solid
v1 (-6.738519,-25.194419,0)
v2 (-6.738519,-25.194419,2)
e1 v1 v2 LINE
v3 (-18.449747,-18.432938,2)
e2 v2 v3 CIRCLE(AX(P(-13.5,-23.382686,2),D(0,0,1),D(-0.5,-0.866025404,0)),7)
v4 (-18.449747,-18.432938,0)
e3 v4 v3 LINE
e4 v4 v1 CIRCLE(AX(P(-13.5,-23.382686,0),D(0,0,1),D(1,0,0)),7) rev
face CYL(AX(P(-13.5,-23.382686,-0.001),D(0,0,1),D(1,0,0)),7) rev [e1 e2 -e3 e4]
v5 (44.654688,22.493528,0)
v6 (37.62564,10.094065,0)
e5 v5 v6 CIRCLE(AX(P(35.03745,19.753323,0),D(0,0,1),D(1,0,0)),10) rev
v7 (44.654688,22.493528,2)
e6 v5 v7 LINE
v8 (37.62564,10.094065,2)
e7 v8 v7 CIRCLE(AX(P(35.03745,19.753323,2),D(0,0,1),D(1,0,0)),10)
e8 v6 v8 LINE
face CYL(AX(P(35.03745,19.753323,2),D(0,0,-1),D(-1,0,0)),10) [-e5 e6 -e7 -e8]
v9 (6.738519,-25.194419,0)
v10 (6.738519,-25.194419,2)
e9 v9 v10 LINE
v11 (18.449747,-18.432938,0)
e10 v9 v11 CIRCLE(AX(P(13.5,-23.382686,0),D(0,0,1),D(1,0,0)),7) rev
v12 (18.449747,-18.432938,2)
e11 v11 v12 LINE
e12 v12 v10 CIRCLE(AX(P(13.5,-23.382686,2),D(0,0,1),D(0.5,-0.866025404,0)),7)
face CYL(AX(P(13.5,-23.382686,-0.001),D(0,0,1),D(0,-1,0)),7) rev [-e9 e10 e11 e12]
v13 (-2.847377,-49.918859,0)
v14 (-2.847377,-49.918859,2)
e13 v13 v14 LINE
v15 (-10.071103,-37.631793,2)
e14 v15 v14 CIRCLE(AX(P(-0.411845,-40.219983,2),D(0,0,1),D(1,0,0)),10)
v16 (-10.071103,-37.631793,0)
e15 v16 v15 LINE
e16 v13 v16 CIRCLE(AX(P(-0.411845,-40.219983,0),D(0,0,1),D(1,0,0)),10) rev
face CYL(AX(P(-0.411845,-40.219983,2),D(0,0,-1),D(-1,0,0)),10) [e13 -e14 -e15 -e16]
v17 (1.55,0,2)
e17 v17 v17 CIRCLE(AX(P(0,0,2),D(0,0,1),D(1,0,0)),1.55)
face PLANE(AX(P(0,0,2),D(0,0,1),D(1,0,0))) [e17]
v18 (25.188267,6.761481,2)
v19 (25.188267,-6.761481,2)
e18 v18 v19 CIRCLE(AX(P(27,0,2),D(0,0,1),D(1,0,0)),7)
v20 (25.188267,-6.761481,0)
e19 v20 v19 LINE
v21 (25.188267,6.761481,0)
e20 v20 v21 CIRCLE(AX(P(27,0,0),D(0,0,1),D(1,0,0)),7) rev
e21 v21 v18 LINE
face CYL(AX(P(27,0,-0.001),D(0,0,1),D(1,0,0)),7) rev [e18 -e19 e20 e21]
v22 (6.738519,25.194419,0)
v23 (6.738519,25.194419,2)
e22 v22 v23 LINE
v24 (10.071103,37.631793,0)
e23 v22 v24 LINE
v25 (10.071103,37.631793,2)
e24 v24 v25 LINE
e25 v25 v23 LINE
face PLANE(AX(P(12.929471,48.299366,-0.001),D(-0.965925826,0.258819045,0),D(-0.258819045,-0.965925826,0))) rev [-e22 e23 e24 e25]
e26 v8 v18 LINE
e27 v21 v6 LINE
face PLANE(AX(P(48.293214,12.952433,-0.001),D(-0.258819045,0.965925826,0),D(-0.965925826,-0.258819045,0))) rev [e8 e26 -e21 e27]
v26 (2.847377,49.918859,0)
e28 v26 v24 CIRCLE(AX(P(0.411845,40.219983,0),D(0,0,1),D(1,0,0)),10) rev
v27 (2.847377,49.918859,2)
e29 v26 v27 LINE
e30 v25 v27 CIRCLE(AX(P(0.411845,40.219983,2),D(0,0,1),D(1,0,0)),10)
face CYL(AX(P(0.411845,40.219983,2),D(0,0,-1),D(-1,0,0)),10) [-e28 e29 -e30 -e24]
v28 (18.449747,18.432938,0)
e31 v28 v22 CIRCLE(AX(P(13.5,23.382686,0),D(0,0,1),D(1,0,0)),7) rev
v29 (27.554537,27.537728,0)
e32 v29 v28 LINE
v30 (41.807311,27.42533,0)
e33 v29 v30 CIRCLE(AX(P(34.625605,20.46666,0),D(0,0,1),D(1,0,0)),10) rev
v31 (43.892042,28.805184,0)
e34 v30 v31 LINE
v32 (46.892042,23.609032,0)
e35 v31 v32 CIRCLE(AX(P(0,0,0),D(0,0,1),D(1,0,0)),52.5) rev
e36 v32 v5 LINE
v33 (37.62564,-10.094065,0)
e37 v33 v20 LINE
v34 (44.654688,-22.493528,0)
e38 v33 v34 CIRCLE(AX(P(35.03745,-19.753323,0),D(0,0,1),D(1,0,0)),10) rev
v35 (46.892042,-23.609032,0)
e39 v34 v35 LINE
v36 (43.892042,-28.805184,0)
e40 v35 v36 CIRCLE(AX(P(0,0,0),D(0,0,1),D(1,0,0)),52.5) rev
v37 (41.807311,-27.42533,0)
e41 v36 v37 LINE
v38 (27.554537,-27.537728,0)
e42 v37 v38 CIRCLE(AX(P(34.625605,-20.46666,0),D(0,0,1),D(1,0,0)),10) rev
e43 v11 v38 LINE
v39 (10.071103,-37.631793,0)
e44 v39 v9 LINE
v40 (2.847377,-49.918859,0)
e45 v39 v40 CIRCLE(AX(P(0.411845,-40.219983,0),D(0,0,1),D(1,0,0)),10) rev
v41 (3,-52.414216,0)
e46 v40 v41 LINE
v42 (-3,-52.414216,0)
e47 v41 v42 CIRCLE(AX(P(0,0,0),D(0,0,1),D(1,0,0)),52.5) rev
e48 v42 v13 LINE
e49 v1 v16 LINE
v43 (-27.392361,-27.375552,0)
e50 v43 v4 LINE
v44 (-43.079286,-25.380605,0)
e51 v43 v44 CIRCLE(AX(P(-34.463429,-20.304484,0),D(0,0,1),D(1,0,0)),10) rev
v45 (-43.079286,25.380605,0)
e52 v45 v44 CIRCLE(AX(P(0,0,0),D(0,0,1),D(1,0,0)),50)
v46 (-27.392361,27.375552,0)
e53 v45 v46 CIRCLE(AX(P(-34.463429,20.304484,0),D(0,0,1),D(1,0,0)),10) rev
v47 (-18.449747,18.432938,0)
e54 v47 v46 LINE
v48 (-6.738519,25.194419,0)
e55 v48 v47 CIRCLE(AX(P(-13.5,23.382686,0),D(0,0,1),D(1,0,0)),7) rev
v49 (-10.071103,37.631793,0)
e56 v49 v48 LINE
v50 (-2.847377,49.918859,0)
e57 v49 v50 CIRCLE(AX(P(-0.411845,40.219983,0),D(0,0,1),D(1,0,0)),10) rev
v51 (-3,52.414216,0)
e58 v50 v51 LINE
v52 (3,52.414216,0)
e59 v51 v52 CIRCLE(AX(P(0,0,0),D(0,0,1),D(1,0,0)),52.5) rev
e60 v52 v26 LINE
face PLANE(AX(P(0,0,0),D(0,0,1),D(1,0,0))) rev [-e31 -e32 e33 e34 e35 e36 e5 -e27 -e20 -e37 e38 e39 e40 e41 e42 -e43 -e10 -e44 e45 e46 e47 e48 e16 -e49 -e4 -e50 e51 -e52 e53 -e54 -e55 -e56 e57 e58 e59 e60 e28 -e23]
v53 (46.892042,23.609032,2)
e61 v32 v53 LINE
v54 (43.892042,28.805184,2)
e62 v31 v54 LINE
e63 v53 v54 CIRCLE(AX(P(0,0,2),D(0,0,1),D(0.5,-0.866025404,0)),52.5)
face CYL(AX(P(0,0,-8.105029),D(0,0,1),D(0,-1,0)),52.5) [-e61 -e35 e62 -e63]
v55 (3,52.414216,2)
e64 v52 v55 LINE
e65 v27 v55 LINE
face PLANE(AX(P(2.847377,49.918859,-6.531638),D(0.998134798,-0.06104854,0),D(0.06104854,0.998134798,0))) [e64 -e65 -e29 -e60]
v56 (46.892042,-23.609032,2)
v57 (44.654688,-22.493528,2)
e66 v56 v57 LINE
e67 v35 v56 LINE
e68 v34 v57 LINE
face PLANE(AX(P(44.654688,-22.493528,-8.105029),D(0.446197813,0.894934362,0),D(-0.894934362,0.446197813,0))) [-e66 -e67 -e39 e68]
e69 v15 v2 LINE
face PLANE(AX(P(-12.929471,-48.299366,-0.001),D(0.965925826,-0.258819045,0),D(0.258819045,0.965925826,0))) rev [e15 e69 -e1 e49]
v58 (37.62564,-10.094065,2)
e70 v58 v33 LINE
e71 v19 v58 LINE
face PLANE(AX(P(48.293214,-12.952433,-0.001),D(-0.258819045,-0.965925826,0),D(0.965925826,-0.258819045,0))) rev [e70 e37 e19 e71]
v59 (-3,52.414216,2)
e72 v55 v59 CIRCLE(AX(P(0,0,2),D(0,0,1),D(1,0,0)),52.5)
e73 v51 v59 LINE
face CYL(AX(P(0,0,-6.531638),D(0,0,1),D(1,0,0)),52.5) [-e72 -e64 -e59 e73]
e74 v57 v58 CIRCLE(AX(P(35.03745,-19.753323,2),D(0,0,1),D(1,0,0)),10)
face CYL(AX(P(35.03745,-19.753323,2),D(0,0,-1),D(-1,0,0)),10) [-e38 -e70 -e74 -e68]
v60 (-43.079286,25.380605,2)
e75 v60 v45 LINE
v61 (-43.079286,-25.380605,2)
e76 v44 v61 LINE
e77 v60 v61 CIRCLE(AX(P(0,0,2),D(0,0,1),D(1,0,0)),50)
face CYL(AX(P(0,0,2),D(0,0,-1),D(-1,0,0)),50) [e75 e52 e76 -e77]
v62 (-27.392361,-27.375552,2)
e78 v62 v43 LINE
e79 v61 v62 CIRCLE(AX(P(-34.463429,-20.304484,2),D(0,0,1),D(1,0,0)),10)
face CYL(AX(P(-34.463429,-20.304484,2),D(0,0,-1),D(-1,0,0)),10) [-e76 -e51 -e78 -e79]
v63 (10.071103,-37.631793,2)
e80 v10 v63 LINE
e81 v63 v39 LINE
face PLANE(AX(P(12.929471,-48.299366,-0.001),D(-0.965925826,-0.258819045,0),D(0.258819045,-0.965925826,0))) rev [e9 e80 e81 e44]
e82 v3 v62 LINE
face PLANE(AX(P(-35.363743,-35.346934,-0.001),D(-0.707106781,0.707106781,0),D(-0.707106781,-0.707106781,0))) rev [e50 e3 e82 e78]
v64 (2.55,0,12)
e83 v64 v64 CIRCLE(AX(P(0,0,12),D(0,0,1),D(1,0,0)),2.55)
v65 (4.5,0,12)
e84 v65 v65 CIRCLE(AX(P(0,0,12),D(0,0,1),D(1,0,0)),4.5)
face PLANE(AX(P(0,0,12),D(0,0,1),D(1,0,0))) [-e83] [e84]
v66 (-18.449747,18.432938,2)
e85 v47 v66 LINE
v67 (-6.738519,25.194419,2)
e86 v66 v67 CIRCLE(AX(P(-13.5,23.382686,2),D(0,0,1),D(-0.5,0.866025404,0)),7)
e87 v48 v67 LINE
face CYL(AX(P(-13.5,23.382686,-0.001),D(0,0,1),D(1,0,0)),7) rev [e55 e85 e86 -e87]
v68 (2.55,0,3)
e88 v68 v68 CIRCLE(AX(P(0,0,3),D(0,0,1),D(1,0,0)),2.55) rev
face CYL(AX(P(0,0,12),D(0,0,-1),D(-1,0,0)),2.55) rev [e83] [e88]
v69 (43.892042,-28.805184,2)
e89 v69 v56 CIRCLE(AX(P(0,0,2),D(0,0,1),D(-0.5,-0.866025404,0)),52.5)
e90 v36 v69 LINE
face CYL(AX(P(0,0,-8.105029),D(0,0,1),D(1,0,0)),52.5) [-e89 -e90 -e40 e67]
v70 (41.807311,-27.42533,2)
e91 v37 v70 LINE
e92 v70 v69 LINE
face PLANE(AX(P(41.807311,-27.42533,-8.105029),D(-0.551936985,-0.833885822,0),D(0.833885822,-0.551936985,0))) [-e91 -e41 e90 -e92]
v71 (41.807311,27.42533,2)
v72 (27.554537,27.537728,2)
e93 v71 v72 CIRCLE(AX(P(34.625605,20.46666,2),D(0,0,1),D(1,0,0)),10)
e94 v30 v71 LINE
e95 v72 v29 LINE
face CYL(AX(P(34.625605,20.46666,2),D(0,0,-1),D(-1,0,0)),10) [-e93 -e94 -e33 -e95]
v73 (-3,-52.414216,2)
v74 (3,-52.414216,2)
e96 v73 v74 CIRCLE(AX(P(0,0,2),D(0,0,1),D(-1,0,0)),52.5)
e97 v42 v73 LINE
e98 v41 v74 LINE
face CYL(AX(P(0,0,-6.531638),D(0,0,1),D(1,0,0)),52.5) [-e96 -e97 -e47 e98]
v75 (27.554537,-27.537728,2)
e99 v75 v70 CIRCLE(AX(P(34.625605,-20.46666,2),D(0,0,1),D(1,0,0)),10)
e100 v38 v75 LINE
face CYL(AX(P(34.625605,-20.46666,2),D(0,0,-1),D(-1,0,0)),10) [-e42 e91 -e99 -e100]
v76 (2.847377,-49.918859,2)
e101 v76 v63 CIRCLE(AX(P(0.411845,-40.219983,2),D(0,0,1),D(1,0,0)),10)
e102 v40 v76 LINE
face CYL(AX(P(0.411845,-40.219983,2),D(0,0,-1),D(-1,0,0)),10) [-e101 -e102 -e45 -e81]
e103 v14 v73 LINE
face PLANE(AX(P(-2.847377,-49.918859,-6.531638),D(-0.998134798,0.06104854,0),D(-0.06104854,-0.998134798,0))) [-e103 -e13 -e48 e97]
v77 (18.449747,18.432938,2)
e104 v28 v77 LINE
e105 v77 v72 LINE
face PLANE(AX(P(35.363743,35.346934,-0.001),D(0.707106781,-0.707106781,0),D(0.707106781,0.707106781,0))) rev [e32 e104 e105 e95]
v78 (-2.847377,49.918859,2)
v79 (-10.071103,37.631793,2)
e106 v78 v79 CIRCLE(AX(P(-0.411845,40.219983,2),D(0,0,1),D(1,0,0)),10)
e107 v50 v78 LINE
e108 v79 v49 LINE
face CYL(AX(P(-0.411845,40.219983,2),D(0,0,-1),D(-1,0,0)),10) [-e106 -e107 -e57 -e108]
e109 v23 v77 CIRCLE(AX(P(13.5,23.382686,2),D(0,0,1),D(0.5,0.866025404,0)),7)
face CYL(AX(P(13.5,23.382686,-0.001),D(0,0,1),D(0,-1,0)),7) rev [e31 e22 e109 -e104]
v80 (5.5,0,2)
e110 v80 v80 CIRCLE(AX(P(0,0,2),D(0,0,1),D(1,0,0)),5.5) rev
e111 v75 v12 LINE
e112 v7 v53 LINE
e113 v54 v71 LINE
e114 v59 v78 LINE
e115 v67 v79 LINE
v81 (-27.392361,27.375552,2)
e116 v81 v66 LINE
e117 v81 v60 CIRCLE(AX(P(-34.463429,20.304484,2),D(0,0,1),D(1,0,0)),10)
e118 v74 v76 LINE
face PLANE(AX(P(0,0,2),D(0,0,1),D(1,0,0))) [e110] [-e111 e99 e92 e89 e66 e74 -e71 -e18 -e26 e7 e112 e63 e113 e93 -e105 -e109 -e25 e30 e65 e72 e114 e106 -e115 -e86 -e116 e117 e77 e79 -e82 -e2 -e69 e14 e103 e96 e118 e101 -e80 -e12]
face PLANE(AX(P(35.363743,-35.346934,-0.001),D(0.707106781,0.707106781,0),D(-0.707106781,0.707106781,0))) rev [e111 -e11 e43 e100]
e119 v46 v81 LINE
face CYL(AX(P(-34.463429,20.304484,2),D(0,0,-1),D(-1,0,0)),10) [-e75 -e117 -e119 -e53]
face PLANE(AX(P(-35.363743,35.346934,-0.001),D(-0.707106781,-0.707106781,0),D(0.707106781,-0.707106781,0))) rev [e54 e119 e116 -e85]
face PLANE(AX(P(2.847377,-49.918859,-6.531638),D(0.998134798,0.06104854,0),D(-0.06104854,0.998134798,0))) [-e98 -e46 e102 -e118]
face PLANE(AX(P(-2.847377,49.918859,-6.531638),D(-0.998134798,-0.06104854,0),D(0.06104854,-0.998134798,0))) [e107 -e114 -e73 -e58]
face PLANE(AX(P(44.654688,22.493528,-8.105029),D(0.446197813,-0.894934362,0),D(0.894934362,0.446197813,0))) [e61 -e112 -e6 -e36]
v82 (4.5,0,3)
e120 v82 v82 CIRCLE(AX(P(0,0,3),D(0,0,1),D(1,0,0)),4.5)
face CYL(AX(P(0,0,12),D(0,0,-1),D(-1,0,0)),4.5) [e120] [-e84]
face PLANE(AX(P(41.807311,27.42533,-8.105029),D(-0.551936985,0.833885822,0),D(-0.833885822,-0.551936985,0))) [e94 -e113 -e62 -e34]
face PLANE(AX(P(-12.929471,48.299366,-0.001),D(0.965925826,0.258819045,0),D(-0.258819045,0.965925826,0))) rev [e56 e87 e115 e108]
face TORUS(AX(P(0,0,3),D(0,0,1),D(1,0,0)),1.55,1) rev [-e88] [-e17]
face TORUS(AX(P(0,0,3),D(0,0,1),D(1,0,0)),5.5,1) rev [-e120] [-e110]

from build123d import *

# Parameters (mm, degrees)
SKETCH1_R                       = 50
BOSS_EXTRUDE1_DEPTH             = 2
BOSS_EXTRUDE3_START             = -2
BOSS_EXTRUDE3_DEPTH             = 2
SKETCH4_R                       = 4.5
SKETCH4_R_2                     = 2.55
BOSS_EXTRUDE2_DEPTH             = 10
CIRPATTERN2_COUNT               = 4
CIRPATTERN2_ANGLE               = 180
CUT_EXTRUDE2_REACH              = 75.186
CIRPATTERN3_COUNT               = 3
CIRPATTERN3_ANGLE               = 120
CIRPATTERN3_THE_OTHER_WAY_COUNT = 3
CIRPATTERN3_THE_OTHER_WAY_ANGLE = 120
FILLET1_R                       = 10
FILLET2_R                       = 1


with BuildPart() as part:
    # Sketch1 → Boss-Extrude1 (new body)
    with BuildSketch(Plane.XY):
        Circle(SKETCH1_R)
    extrude(amount=BOSS_EXTRUDE1_DEPTH)

    # Sketch5 → Boss-Extrude3 (add)
    with BuildSketch(Plane.XY.offset(2).offset(BOSS_EXTRUDE3_START)):
        with BuildLine():
            Line((-2.847377425, 49.918858579), (-3, 52.414215629))
            ThreePointArc((-3, 52.414215629), (0, 52.5), (3, 52.414215629))
            Line((3, 52.414215629), (2.847377425, 49.918858579))
            ThreePointArc((2.847377425, 49.918858579), (0, 50), (-2.847377425, 49.918858579))
        make_face()
    boss_extrude3 = extrude(amount=BOSS_EXTRUDE3_DEPTH)

    # Sketch4 → Boss-Extrude2 (add)
    with BuildSketch(Plane.XY.offset(2)):
        Circle(SKETCH4_R)
        Circle(SKETCH4_R_2, mode=Mode.SUBTRACT)
    extrude(amount=BOSS_EXTRUDE2_DEPTH)

    # CirPattern2: Boss-Extrude3 ×4 about axis
    cirpattern2_axis = Axis((0, 0, 0), (0, 0, -1))
    for i in range(1, CIRPATTERN2_COUNT):
        add(boss_extrude3.rotate(cirpattern2_axis, i * CIRPATTERN2_ANGLE / (CIRPATTERN2_COUNT - 1)))

    # Sketch7 → Cut-Extrude2 (cut, up to next)
    with BuildSketch(Plane.XY.offset(2), mode=Mode.PRIVATE) as cut_extrude2_sk1:
        with BuildLine():
            Line((48.293213683, 12.952432674), (25.188266684, 6.761480784))
            ThreePointArc((25.188266684, 6.761480784), (20, 0), (25.188266684, -6.761480784))
            Line((25.188266684, -6.761480784), (48.293213683, -12.952432674))
            ThreePointArc((48.293213683, -12.952432674), (50, 0), (48.293213683, 12.952432674))
        make_face()
    cut_extrude2_tool1 = extrude(cut_extrude2_sk1.sketch, amount=-CUT_EXTRUDE2_REACH, mode=Mode.PRIVATE) & part.part
    cut_extrude2 = cut_extrude2_tool1.solids().sort_by_distance((37.115477, 0, 2))[0]
    add(cut_extrude2, mode=Mode.SUBTRACT)

    # CirPattern3: Cut-Extrude2 ×3 about axis
    cirpattern3_axis = Axis((0, 0, 0), (0, 0, 1))
    for i in range(1, CIRPATTERN3_COUNT):
        add(cut_extrude2.rotate(cirpattern3_axis, i * CIRPATTERN3_ANGLE / (CIRPATTERN3_COUNT - 1)), mode=Mode.SUBTRACT)

    # CirPattern3 the other way: Cut-Extrude2 ×3 about axis
    cirpattern3_the_other_way_axis = Axis((0, 0, 0), (0, 0, -1))
    for i in range(1, CIRPATTERN3_THE_OTHER_WAY_COUNT):
        add(cut_extrude2.rotate(cirpattern3_the_other_way_axis, i * CIRPATTERN3_THE_OTHER_WAY_ANGLE / (CIRPATTERN3_THE_OTHER_WAY_COUNT - 1)), mode=Mode.SUBTRACT)

    # Fillet1
    # the kernel refuses this fillet: 10 mm, written as the material it takes off along each edge
    with BuildSketch(Plane(origin=(-35.363742578, 35.346933543, 33.509652434), x_dir=(-0.6121571340688006, -0.7907361400673886, 0), z_dir=(0, 0, -1))) as fillet1_piece_1:
        with BuildLine():
            CenterArc((11.343474876, -9.920253368), FILLET1_R, 82.759261871, 104.49509636)
            Line((1.423521402, -11.182997629), (1.225122333, -11.208252514))
            Line((1.225122333, -11.208252514), (-0.198399069, -0.025254885))
            Line((-0.198399069, -0.025254885), (-0.025207722, 0.198405067))
            ThreePointArc((-0.025207722, 0.198405067), (6.301930487, 0.59873316), (12.629068696, 0.198405067))
            Line((12.629068696, 0.198405067), (12.603860974, 0))
        make_face()
    extrude(amount=65.019304869, mode=Mode.SUBTRACT)
    with BuildSketch(Plane(origin=(-12.929471105, 48.299366217, 29.609711649), x_dir=(0.9873433189599674, 0.15859751103064706, 0), z_dir=(0, 0, -1))) as fillet1_piece_2:
        with BuildLine():
            CenterArc((11.077824317, 9.96238911), FILLET1_R, 174.125500121, 90.903649981)
            Line((1.130339641, 10.985887341), (0.931389948, 11.006357306))
            Line((0.931389948, 11.006357306), (-0.198949694, 0.020469965))
            Line((-0.198949694, 0.020469965), (-0.020422671, -0.198954554))
            ThreePointArc((-0.020422671, -0.198954554), (5.105667647, -0.46136152), (10.194005514, -0.199247782))
            Line((10.194005514, -0.199247782), (10.211335295, 0))
        make_face()
    extrude(amount=57.219423297, mode=Mode.SUBTRACT)
    with BuildSketch(Plane(origin=(35.363742578, -35.346933543, 29.609711649), x_dir=(0.6310211330095078, 0.775765640960849, 0), z_dir=(0, 0, -1)), Plane(origin=(-12.929471105, -48.299366217, 29.609711649), x_dir=(0.9873433189599667, -0.1585975110306507, 0), z_dir=(0, 0, -1)), Plane(origin=(12.929471105, 48.299366217, 29.609711649), x_dir=(-0.987343318959968, 0.15859751103064254, 0), z_dir=(0, 0, -1)), Plane(origin=(48.293213683, 12.952432674, 29.609711649), x_dir=(-0.35632218595046244, 0.9343631519914962, 0), z_dir=(0, 0, -1))) as fillet1_piece_3:
        with BuildLine():
            CenterArc((11.077824317, -9.96238911), FILLET1_R, 94.970849897, 90.903649981)
            Line((1.130339641, -10.985887341), (0.931389948, -11.006357306))
            Line((0.931389948, -11.006357306), (-0.198949694, -0.020469965))
            Line((-0.198949694, -0.020469965), (-0.020422671, 0.198954554))
            ThreePointArc((-0.020422671, 0.198954554), (5.105667647, 0.46136152), (10.194005514, 0.199247782))
            Line((10.194005514, 0.199247782), (10.211335295, 0))
        make_face()
    extrude(amount=57.219423297, mode=Mode.SUBTRACT)
    with BuildSketch(Plane(origin=(12.929471105, -48.299366217, 29.609711649), x_dir=(-0.2588190451025242, 0.9659258262890674, 0), z_dir=(0, 0, -1)), Plane(origin=(35.363742578, 35.346933543, 29.609711649), x_dir=(-0.7071067811865411, -0.707106781186554, 0), z_dir=(0, 0, -1)), Plane(origin=(48.293213683, -12.952432674, 29.609711649), x_dir=(-0.96592582628907, 0.2588190451025145, 0), z_dir=(0, 0, -1))) as fillet1_piece_4:
        with BuildLine():
            CenterArc((11.043884659, -10), FILLET1_R, 90, 90.903649981)
            Line((1.045128361, -10.157710136), (0.845153235, -10.160864339))
            ThreePointArc((0.845153235, -10.160864339), (0.063625516, -5.126075338), (-0.199999994, -4.7543e-05))
            Line((-0.199999994, -4.7543e-05), (0, 0.2))
            Line((0, 0.2), (11.043884659, 0.2))
            Line((11.043884659, 0.2), (11.043884659, 0))
        make_face()
    extrude(amount=57.219423297, mode=Mode.SUBTRACT)
    with BuildSketch(Plane(origin=(-35.363742578, -35.346933543, 33.509652434), x_dir=(0.7071067811865469, 0.7071067811865481, 0), z_dir=(0, 0, -1))) as fillet1_piece_5:
        with BuildLine():
            CenterArc((11.273235967, -10), FILLET1_R, 90, 104.49509636)
            Line((1.591545311, -12.502971446), (1.397911498, -12.553030874))
            ThreePointArc((1.397911498, -12.553030874), (0.201832147, -6.327090409), (-0.199999994, -4.7543e-05))
            Line((-0.199999994, -4.7543e-05), (0, 0.2))
            Line((0, 0.2), (11.273235967, 0.2))
            Line((11.273235967, 0.2), (11.273235967, 0))
        make_face()
    extrude(amount=65.019304869, mode=Mode.SUBTRACT)

    # Fillet2
    fillet2_edges = [part.edges().sort_by_distance(p)[0] for p in [
        (-2.55, 0, 2),
        (-4.5, 0, 2),
    ]]
    fillet(fillet2_edges, radius=FILLET2_R)


solid = part.part
